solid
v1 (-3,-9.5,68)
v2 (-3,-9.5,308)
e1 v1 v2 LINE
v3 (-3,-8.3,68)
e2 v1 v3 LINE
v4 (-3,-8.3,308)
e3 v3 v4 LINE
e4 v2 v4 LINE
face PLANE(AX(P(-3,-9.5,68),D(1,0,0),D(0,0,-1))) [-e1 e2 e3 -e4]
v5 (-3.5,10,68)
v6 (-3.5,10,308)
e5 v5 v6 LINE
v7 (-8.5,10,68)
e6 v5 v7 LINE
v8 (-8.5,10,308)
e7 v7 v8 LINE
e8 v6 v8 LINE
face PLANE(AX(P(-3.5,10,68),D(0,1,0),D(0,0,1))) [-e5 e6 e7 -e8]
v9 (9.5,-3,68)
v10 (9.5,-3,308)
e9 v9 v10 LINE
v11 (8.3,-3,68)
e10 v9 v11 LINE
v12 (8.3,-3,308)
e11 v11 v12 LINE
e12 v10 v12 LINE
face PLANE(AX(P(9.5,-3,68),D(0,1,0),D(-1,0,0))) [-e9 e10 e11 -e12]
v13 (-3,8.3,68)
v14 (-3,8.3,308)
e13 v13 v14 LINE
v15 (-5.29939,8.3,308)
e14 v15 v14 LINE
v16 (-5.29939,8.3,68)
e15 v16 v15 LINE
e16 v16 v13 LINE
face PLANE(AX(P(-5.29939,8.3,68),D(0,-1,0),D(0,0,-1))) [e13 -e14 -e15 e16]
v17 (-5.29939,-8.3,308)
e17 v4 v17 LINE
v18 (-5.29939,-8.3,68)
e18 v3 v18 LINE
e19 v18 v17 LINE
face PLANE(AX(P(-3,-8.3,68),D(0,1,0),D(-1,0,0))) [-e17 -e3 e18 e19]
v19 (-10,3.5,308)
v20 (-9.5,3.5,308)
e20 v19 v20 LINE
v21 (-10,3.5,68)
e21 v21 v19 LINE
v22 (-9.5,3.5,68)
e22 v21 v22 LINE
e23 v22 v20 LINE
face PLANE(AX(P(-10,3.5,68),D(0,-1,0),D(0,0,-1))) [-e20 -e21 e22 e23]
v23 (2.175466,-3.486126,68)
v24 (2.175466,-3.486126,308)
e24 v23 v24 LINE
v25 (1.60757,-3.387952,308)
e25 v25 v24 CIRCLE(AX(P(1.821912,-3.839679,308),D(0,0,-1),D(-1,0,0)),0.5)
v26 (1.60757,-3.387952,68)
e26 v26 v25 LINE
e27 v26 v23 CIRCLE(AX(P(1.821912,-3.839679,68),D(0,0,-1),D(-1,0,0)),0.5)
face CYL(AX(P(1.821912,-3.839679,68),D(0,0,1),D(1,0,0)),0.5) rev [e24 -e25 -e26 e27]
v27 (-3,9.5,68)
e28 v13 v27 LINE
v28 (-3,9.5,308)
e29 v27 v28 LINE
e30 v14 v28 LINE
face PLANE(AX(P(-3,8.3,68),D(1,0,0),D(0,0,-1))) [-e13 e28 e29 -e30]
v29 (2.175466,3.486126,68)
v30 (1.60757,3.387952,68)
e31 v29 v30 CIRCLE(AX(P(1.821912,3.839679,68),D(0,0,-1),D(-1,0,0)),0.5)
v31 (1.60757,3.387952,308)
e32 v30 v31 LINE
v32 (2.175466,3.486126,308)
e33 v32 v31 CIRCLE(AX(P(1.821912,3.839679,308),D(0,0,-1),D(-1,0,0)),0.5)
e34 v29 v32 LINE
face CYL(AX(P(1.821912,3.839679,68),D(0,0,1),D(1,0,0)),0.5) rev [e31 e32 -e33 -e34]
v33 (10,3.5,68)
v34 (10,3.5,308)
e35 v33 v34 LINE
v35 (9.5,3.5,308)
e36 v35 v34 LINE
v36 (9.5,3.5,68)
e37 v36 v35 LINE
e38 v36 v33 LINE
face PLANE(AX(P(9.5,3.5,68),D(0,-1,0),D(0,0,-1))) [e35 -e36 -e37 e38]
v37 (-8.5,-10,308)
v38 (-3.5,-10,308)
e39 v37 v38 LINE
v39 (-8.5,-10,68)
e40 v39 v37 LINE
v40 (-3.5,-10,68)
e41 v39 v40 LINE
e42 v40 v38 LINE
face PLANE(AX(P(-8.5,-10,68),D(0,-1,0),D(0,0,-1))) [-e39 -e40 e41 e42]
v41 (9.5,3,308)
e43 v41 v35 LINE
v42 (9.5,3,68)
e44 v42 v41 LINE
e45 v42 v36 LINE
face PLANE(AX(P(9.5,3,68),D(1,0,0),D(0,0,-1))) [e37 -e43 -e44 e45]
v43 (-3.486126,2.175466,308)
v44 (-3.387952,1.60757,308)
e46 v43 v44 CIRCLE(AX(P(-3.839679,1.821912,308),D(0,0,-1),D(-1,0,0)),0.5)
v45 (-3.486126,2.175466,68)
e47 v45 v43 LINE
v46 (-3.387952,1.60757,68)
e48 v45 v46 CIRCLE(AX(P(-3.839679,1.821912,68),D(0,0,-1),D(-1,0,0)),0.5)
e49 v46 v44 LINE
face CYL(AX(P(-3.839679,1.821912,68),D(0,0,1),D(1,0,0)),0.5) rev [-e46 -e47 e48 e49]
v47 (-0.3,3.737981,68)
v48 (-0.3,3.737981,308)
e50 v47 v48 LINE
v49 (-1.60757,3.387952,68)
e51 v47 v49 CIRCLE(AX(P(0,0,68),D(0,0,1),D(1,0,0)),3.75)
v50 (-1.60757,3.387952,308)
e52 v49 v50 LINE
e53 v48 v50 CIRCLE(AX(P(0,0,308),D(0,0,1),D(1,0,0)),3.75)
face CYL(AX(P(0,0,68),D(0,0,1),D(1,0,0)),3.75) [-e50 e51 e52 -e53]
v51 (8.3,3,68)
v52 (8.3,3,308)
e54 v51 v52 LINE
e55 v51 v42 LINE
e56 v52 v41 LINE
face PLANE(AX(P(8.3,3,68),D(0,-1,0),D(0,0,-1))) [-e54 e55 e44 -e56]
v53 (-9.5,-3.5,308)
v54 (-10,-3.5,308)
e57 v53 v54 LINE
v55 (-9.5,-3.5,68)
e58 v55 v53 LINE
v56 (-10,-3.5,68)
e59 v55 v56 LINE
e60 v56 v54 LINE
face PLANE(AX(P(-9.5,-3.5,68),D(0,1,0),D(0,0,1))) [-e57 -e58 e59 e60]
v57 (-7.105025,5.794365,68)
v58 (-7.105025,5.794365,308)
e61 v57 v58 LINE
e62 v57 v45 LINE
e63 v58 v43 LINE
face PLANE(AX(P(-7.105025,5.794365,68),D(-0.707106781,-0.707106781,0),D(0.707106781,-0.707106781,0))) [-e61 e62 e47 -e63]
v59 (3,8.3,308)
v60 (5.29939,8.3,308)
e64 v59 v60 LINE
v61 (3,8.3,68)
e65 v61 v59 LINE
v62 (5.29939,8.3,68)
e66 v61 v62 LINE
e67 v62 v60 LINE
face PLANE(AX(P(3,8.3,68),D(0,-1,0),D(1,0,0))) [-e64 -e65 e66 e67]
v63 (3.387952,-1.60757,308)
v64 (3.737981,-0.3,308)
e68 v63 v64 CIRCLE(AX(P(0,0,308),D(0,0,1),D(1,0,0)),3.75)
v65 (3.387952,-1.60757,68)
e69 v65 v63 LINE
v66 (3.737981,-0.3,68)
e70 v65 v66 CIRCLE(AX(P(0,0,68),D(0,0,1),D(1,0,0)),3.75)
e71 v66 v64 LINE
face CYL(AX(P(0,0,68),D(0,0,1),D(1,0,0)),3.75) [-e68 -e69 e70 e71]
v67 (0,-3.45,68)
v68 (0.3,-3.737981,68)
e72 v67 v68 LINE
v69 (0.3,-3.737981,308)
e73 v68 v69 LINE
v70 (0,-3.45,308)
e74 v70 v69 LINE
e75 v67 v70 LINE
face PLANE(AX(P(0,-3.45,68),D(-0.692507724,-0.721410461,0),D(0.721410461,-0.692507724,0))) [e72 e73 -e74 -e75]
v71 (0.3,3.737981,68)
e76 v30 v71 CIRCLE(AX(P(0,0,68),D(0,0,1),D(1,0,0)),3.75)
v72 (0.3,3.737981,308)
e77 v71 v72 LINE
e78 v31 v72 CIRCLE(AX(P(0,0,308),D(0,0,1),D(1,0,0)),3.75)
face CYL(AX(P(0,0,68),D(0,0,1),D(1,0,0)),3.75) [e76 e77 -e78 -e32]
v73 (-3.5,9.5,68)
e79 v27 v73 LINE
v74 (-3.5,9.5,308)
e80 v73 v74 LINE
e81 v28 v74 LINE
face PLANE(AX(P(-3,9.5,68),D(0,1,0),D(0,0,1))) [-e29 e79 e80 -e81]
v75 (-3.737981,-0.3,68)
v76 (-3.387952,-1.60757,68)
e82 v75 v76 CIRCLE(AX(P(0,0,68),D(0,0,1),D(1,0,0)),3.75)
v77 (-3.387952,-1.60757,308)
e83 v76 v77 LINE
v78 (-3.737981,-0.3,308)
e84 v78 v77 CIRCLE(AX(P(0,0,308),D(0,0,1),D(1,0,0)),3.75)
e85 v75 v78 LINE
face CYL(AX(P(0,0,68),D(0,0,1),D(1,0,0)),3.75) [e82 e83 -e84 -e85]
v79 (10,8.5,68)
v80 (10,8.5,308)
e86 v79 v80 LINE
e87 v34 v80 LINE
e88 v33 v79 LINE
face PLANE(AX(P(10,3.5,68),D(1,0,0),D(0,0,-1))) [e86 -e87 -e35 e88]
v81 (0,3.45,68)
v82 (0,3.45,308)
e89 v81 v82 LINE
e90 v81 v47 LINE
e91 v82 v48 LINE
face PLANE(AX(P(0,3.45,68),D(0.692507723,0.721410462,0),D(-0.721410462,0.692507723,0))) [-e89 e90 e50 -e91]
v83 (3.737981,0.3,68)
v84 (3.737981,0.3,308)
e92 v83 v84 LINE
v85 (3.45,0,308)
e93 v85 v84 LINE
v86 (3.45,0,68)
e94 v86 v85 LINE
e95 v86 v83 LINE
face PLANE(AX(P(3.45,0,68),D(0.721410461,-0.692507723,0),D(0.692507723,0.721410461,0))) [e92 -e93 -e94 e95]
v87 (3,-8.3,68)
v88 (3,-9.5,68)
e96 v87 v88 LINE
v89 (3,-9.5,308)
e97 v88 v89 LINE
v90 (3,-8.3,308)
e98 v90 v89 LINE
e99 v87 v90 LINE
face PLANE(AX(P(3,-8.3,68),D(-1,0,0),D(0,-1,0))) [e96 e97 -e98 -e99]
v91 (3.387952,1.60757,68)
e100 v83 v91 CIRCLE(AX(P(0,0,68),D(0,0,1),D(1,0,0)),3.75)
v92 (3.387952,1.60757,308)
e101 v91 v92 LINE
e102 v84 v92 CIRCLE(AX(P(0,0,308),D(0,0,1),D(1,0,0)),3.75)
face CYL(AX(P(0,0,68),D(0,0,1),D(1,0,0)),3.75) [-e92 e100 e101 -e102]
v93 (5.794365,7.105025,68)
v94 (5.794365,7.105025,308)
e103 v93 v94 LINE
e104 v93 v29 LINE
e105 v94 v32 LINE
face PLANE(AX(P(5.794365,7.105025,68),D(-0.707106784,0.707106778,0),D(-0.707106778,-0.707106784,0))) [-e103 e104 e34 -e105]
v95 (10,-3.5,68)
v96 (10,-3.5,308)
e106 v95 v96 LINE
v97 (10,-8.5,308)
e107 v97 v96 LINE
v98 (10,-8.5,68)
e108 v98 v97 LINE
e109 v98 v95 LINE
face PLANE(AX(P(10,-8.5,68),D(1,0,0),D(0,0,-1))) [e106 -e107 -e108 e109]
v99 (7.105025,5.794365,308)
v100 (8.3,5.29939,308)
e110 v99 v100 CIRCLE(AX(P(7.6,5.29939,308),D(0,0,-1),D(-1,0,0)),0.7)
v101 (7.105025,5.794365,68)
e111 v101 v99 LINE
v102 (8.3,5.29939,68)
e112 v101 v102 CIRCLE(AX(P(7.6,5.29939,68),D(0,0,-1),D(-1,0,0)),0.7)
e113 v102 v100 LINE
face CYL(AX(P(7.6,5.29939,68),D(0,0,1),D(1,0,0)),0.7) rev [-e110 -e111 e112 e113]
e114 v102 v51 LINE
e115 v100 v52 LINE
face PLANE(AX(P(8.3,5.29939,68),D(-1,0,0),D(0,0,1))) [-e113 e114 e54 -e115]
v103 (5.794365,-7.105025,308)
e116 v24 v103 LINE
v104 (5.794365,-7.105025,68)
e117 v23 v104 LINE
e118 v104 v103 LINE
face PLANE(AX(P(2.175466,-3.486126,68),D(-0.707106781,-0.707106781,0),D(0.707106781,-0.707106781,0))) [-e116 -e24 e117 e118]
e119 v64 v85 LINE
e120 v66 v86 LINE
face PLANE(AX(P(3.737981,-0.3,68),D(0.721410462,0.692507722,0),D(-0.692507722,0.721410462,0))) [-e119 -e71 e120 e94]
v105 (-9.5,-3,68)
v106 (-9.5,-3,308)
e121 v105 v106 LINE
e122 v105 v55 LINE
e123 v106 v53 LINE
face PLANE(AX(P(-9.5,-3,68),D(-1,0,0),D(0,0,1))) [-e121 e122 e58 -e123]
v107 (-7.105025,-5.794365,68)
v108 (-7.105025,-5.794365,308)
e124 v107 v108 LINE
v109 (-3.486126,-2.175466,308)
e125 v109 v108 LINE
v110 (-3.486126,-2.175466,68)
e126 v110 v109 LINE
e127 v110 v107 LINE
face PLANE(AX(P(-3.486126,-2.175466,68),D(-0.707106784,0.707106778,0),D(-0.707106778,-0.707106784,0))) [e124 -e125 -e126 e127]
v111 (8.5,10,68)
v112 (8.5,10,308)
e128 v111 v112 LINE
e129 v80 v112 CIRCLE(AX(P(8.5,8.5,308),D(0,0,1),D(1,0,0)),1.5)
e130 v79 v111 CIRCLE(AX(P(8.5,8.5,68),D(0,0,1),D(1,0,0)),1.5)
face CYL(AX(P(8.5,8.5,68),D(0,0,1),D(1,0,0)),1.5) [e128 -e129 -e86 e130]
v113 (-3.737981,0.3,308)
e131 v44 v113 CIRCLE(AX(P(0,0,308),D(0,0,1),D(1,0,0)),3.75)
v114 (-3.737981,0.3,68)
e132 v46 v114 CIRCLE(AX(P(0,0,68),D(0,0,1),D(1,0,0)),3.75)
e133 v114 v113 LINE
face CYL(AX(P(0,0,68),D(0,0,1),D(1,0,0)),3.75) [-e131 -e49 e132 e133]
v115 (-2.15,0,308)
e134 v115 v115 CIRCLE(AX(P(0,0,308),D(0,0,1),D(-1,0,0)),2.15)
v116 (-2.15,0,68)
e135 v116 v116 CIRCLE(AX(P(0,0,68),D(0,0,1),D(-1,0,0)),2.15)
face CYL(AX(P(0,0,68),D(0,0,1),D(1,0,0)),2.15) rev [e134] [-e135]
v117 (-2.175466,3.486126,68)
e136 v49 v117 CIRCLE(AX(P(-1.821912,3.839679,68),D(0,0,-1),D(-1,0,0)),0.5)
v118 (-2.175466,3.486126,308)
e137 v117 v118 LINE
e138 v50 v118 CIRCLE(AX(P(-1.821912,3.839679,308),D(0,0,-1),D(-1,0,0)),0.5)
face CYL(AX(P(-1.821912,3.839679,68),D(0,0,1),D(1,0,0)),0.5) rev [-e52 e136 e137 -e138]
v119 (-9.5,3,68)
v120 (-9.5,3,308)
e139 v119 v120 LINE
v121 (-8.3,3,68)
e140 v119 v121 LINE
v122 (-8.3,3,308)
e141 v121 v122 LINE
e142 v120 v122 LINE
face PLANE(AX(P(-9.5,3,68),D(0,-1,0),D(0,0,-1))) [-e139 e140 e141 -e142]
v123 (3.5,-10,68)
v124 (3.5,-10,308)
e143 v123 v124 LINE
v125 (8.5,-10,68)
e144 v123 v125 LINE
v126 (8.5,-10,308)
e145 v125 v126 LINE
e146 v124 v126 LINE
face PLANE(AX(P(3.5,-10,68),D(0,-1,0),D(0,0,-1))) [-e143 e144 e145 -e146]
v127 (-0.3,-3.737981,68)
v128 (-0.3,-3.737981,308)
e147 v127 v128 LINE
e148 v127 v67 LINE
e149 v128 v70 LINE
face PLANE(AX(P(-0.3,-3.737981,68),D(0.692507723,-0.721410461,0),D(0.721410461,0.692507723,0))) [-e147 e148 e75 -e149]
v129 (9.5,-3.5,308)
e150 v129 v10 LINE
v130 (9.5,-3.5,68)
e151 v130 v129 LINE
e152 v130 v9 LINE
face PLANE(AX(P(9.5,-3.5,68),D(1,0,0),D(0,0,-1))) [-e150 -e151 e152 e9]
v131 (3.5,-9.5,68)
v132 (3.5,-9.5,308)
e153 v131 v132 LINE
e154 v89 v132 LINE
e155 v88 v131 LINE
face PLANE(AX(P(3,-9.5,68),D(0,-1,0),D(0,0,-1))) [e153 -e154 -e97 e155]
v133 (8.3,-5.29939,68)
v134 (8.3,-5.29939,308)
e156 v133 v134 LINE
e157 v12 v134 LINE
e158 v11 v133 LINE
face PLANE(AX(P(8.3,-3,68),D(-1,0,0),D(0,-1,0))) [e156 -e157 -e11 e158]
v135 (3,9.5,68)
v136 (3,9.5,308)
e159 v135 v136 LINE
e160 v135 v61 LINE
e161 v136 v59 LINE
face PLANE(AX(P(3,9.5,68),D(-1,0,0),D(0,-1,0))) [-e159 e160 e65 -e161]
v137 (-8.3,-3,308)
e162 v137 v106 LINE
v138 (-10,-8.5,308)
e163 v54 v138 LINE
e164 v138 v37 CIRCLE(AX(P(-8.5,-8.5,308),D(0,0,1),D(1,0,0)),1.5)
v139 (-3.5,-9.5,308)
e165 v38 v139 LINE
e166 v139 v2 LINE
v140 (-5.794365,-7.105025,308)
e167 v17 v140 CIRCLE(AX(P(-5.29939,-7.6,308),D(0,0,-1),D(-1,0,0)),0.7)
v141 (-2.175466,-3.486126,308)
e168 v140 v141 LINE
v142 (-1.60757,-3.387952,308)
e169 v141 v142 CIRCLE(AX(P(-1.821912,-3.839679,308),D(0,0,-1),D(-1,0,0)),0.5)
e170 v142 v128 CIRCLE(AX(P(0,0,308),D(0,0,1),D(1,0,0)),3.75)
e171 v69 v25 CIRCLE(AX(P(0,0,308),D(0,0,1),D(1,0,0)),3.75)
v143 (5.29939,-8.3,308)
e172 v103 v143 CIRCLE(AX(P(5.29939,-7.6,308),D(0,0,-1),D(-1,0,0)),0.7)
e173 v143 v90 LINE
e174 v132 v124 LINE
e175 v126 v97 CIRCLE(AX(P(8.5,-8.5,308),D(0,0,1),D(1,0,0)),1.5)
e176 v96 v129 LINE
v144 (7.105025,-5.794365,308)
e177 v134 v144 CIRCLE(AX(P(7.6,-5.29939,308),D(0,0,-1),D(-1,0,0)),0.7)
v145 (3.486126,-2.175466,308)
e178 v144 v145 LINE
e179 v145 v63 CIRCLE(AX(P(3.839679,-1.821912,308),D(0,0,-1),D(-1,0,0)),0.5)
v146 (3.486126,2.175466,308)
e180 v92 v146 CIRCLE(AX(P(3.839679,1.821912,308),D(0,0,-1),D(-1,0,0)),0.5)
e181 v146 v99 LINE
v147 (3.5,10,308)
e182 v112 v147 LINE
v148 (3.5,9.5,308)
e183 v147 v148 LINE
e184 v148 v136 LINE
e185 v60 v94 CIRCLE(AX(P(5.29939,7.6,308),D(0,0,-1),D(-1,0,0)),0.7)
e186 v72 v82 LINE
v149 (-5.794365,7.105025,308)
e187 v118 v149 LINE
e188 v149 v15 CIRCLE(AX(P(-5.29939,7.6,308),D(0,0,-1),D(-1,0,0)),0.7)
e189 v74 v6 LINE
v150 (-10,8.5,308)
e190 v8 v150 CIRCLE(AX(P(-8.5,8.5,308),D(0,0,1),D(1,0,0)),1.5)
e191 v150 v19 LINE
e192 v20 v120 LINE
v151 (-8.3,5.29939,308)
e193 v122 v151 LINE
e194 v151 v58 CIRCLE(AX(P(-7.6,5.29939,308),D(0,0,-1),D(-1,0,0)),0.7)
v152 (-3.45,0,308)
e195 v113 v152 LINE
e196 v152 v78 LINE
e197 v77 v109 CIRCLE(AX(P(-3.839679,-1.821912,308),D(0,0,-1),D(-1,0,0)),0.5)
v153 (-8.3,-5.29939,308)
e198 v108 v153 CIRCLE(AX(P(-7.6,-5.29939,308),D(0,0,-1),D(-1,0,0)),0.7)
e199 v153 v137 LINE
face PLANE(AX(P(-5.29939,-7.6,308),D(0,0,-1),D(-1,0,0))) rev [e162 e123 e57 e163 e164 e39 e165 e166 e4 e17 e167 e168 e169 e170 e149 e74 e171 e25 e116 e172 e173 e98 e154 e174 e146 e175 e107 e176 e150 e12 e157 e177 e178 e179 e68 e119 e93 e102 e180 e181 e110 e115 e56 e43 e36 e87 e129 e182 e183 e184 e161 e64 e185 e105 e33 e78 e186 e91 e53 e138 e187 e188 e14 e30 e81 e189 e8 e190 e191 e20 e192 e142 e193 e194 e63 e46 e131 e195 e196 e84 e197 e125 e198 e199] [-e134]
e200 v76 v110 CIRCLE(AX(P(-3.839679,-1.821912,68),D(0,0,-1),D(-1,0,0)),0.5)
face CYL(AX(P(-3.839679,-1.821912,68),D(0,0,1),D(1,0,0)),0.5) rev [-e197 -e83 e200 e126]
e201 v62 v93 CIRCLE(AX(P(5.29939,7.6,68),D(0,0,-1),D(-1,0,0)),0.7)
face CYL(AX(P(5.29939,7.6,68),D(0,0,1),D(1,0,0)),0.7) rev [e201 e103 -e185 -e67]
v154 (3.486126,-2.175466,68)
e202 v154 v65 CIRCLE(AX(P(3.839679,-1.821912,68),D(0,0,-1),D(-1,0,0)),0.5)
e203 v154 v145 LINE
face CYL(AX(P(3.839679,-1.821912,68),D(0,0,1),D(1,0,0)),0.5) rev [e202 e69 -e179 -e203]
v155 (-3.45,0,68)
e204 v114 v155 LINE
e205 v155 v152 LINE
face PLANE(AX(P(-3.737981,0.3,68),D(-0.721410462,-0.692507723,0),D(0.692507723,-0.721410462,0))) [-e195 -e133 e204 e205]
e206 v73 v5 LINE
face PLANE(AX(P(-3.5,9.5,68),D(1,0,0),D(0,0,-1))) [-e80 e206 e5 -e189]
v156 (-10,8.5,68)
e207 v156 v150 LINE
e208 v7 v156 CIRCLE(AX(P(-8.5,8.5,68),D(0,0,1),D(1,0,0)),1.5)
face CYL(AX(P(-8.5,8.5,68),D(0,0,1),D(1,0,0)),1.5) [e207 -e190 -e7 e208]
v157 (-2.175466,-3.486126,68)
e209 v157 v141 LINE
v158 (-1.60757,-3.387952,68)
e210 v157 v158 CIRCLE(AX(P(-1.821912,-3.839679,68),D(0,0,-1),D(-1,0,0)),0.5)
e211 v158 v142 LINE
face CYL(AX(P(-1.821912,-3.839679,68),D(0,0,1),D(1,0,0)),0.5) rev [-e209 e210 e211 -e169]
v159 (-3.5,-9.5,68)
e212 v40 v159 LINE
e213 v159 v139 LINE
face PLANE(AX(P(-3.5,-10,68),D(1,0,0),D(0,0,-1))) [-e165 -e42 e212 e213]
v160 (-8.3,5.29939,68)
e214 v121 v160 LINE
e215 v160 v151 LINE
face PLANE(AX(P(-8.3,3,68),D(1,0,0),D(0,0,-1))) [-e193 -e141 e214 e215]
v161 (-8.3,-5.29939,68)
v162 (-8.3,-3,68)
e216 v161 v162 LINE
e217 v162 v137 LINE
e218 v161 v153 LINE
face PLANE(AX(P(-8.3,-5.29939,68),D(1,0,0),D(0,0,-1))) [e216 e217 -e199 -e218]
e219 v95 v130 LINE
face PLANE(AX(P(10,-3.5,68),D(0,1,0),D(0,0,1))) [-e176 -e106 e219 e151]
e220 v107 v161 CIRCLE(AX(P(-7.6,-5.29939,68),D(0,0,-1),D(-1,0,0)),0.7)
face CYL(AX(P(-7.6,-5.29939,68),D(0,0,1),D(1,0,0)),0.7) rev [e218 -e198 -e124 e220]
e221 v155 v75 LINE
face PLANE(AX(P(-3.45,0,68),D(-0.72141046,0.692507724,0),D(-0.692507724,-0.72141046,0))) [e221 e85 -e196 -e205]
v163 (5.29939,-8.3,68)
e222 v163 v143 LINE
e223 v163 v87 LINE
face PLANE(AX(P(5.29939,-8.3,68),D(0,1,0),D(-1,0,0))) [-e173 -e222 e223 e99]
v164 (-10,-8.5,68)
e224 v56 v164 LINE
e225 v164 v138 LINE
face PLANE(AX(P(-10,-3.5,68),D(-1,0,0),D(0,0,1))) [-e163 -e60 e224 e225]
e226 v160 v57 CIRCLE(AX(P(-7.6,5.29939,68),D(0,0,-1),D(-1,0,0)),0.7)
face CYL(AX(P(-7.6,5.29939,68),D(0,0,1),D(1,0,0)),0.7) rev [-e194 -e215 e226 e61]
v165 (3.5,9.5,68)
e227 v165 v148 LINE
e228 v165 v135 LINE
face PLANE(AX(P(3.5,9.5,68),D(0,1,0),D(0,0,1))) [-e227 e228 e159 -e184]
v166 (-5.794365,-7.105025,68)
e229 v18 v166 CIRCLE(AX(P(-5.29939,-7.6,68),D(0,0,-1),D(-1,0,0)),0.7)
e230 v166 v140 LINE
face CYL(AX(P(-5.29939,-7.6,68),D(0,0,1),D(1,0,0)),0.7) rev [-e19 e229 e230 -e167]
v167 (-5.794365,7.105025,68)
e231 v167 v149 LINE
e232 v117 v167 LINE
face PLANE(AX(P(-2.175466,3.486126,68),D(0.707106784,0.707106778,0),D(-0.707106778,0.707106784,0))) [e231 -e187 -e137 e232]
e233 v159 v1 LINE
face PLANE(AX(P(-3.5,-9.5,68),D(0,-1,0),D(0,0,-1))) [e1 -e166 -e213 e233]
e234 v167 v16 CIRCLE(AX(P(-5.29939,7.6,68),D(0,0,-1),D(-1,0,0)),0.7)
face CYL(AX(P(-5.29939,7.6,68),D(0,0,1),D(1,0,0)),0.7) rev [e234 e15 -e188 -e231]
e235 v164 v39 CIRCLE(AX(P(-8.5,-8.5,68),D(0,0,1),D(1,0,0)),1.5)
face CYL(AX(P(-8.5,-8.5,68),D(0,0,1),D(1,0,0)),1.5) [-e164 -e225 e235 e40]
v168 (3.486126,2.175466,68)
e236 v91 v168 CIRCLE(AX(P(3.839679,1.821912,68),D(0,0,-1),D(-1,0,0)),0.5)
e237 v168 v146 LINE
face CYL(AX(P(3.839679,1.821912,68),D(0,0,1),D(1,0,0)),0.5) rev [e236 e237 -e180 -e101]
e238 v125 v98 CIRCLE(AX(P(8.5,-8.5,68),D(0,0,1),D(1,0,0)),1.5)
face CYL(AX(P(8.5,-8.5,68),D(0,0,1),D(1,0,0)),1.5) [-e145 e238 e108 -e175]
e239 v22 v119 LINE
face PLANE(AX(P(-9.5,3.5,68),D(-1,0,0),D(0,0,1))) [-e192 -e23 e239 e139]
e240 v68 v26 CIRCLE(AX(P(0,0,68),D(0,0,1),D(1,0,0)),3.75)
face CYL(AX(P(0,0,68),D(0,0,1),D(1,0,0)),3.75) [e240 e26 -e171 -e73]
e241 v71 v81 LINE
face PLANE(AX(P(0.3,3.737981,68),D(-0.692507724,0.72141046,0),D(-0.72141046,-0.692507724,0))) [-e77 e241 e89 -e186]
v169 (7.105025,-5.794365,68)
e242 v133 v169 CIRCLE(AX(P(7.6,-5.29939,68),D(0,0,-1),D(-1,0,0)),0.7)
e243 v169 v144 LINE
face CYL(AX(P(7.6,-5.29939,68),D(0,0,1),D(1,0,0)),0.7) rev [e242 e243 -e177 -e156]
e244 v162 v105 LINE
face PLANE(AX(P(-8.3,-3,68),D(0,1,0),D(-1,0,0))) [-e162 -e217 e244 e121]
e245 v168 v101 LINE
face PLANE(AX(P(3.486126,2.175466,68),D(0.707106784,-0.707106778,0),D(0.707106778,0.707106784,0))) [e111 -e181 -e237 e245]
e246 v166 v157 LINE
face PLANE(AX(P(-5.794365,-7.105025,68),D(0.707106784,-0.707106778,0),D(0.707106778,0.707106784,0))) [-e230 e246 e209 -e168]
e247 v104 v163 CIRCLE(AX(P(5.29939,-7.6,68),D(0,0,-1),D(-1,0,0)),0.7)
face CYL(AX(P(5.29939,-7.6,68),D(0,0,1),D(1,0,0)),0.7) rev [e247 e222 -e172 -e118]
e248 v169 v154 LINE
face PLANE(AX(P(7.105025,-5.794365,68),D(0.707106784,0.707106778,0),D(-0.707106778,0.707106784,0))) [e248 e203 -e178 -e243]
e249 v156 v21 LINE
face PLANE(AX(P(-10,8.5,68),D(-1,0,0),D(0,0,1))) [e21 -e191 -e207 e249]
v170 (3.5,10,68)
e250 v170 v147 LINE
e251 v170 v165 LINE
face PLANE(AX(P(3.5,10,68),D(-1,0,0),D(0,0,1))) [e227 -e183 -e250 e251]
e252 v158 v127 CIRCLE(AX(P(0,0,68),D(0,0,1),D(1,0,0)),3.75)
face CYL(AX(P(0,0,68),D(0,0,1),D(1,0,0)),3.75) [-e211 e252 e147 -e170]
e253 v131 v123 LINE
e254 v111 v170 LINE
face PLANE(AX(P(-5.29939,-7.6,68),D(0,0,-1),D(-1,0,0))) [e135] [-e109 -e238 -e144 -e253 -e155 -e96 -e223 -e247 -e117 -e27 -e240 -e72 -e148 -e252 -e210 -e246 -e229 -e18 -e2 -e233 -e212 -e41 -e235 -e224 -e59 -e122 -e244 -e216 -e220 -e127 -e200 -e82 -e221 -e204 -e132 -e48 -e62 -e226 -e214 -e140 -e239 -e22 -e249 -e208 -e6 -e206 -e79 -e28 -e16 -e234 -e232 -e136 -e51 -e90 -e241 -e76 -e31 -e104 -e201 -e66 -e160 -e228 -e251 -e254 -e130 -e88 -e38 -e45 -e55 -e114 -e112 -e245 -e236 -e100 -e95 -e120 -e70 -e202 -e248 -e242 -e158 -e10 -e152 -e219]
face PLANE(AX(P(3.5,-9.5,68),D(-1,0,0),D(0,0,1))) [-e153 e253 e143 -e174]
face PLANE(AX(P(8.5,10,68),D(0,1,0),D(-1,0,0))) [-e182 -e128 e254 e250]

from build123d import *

# Parameters (mm, degrees)
SKETCH1_R           = 2.15
BOSS_EXTRUDE1_DEPTH = 240


# Read off the part's stored shape, not the designer's step: moBlkMgr[nhom 20x20x200]
with BuildPart() as part:
    # Sketch1 → Boss-Extrude1 (new body)
    with BuildSketch(Plane.XY.offset(308)):
        with BuildLine():
            Line((-3.499999948, -10), (-3.499999948, -9.5))
            Line((-3.499999948, -9.5), (-2.999999948, -9.5))
            Line((-2.999999948, -9.5), (-2.999999948, -8.299999968))
            Line((-2.999999948, -8.299999968), (-5.299390251, -8.299999968))
            ThreePointArc((-5.299390251, -8.299999968), (-5.946105923, -7.867878372), (-5.794365, -7.105025224))
            Line((-5.794365, -7.105025224), (-2.175465548, -3.48612574))
            ThreePointArc((-2.175465548, -3.48612574), (-1.907085057, -3.346986956), (-1.607569547, -3.387952169))
            ThreePointArc((-1.607569547, -3.387952169), (-0.96970891, -3.622452814), (-0.299999981, -3.73798071))
            Line((-0.299999981, -3.73798071), (1.9e-08, -3.449999972))
            Line((1.9e-08, -3.449999972), (0.300000019, -3.737980711))
            ThreePointArc((0.300000019, -3.737980711), (0.969708957, -3.622452812), (1.607569601, -3.387952162))
            ThreePointArc((1.607569601, -3.387952162), (1.90708511, -3.346986948), (2.175465602, -3.48612573))
            Line((2.175465602, -3.48612573), (5.794365085, -7.105025213))
            ThreePointArc((5.794365085, -7.105025213), (5.946106012, -7.867878368), (5.299390335, -8.299999968))
            Line((5.299390335, -8.299999968), (2.999999948, -8.299999968))
            Line((2.999999948, -8.299999968), (2.999999948, -9.5))
            Line((2.999999948, -9.5), (3.499999948, -9.5))
            Line((3.499999948, -9.5), (3.499999948, -10))
            Line((3.499999948, -10), (8.499999948, -10))
            ThreePointArc((8.499999948, -10), (9.56066012, -9.560660172), (9.999999948, -8.5))
            Line((9.999999948, -8.5), (9.999999948, -3.5))
            Line((9.999999948, -3.5), (9.499999948, -3.5))
            Line((9.499999948, -3.5), (9.499999948, -3))
            Line((9.499999948, -3), (8.299999976, -3))
            Line((8.299999976, -3), (8.299999976, -5.299390317))
            ThreePointArc((8.299999976, -5.299390317), (7.867878377, -5.94610599), (7.105025227, -5.794365061))
            Line((7.105025227, -5.794365061), (3.486125768, -2.17546557))
            ThreePointArc((3.486125768, -2.17546557), (3.346986986, -1.907085078), (3.387952202, -1.607569568))
            ThreePointArc((3.387952202, -1.607569568), (3.622452857, -0.969708918), (3.737980757, -0.299999973))
            Line((3.737980757, -0.299999973), (3.450000019, 2.8e-08))
            Line((3.450000019, 2.8e-08), (3.737980758, 0.300000028))
            ThreePointArc((3.737980758, 0.300000028), (3.622452857, 0.969708973), (3.387952202, 1.607569624))
            ThreePointArc((3.387952202, 1.607569624), (3.346986986, 1.907085133), (3.486125768, 2.175465626))
            Line((3.486125768, 2.175465626), (7.105025228, 5.794365118))
            ThreePointArc((7.105025228, 5.794365118), (7.867878378, 5.946106047), (8.299999976, 5.299390374))
            Line((8.299999976, 5.299390374), (8.299999976, 3))
            Line((8.299999976, 3), (9.499999948, 3))
            Line((9.499999948, 3), (9.499999948, 3.5))
            Line((9.499999948, 3.5), (9.999999948, 3.5))
            Line((9.999999948, 3.5), (9.999999948, 8.5))
            ThreePointArc((9.999999948, 8.5), (9.56066012, 9.560660172), (8.499999948, 10))
            Line((8.499999948, 10), (3.499999948, 10))
            Line((3.499999948, 10), (3.499999948, 9.5))
            Line((3.499999948, 9.5), (2.999999948, 9.5))
            Line((2.999999948, 9.5), (2.999999948, 8.300000024))
            Line((2.999999948, 8.300000024), (5.299390295, 8.300000024))
            ThreePointArc((5.299390295, 8.300000024), (5.946105965, 7.86787843), (5.794365042, 7.105025283))
            Line((5.794365042, 7.105025283), (2.175465586, 3.486125796))
            ThreePointArc((2.175465586, 3.486125796), (1.907085095, 3.346987012), (1.607569585, 3.387952225))
            ThreePointArc((1.607569585, 3.387952225), (0.969708948, 3.62245287), (0.300000018, 3.737980766))
            Line((0.300000018, 3.737980766), (1.9e-08, 3.450000028))
            Line((1.9e-08, 3.450000028), (-0.299999982, 3.737980766))
            ThreePointArc((-0.299999982, 3.737980766), (-0.969708911, 3.62245287), (-1.607569547, 3.387952225))
            ThreePointArc((-1.607569547, 3.387952225), (-1.907085057, 3.346987012), (-2.175465548, 3.486125796))
            Line((-2.175465548, 3.486125796), (-5.794365, 7.105025279))
            ThreePointArc((-5.794365, 7.105025279), (-5.946105923, 7.867878428), (-5.299390251, 8.300000024))
            Line((-5.299390251, 8.300000024), (-2.999999948, 8.300000024))
            Line((-2.999999948, 8.300000024), (-2.999999948, 9.5))
            Line((-2.999999948, 9.5), (-3.499999948, 9.5))
            Line((-3.499999948, 9.5), (-3.499999948, 10))
            Line((-3.499999948, 10), (-8.499999948, 10))
            ThreePointArc((-8.499999948, 10), (-9.56066012, 9.560660172), (-9.999999948, 8.5))
            Line((-9.999999948, 8.5), (-9.999999948, 3.5))
            Line((-9.999999948, 3.5), (-9.499999948, 3.5))
            Line((-9.499999948, 3.5), (-9.499999948, 3))
            Line((-9.499999948, 3), (-8.299999938, 3))
            Line((-8.299999938, 3), (-8.299999938, 5.299390329))
            ThreePointArc((-8.299999938, 5.299390329), (-7.867878344, 5.946105997), (-7.1050252, 5.794365072))
            Line((-7.1050252, 5.794365072), (-3.486125739, 2.175465611))
            ThreePointArc((-3.486125739, 2.175465611), (-3.346986957, 1.907085119), (-3.387952171, 1.607569609))
            ThreePointArc((-3.387952171, 1.607569609), (-3.622452821, 0.969708966), (-3.737980719, 0.300000029))
            Line((-3.737980719, 0.300000029), (-3.449999981, 2.8e-08))
            Line((-3.449999981, 2.8e-08), (-3.737980719, -0.299999971))
            ThreePointArc((-3.737980719, -0.299999971), (-3.622452819, -0.969708917), (-3.387952164, -1.607569568))
            ThreePointArc((-3.387952164, -1.607569568), (-3.346986948, -1.907085078), (-3.486125729, -2.17546557))
            Line((-3.486125729, -2.17546557), (-7.105025189, -5.794365061))
            ThreePointArc((-7.105025189, -5.794365061), (-7.867878339, -5.94610599), (-8.299999938, -5.299390317))
            Line((-8.299999938, -5.299390317), (-8.299999938, -3))
            Line((-8.299999938, -3), (-9.499999948, -3))
            Line((-9.499999948, -3), (-9.499999948, -3.5))
            Line((-9.499999948, -3.5), (-9.999999948, -3.5))
            Line((-9.999999948, -3.5), (-9.999999948, -8.5))
            ThreePointArc((-9.999999948, -8.5), (-9.56066012, -9.560660172), (-8.499999948, -10))
            Line((-8.499999948, -10), (-3.499999948, -10))
        make_face()
        with Locations(Location((1.9e-08, 2.8e-08, 0), (0, 0, 180))):
            Circle(SKETCH1_R, mode=Mode.SUBTRACT)
    extrude(amount=-BOSS_EXTRUDE1_DEPTH)


solid = part.part
